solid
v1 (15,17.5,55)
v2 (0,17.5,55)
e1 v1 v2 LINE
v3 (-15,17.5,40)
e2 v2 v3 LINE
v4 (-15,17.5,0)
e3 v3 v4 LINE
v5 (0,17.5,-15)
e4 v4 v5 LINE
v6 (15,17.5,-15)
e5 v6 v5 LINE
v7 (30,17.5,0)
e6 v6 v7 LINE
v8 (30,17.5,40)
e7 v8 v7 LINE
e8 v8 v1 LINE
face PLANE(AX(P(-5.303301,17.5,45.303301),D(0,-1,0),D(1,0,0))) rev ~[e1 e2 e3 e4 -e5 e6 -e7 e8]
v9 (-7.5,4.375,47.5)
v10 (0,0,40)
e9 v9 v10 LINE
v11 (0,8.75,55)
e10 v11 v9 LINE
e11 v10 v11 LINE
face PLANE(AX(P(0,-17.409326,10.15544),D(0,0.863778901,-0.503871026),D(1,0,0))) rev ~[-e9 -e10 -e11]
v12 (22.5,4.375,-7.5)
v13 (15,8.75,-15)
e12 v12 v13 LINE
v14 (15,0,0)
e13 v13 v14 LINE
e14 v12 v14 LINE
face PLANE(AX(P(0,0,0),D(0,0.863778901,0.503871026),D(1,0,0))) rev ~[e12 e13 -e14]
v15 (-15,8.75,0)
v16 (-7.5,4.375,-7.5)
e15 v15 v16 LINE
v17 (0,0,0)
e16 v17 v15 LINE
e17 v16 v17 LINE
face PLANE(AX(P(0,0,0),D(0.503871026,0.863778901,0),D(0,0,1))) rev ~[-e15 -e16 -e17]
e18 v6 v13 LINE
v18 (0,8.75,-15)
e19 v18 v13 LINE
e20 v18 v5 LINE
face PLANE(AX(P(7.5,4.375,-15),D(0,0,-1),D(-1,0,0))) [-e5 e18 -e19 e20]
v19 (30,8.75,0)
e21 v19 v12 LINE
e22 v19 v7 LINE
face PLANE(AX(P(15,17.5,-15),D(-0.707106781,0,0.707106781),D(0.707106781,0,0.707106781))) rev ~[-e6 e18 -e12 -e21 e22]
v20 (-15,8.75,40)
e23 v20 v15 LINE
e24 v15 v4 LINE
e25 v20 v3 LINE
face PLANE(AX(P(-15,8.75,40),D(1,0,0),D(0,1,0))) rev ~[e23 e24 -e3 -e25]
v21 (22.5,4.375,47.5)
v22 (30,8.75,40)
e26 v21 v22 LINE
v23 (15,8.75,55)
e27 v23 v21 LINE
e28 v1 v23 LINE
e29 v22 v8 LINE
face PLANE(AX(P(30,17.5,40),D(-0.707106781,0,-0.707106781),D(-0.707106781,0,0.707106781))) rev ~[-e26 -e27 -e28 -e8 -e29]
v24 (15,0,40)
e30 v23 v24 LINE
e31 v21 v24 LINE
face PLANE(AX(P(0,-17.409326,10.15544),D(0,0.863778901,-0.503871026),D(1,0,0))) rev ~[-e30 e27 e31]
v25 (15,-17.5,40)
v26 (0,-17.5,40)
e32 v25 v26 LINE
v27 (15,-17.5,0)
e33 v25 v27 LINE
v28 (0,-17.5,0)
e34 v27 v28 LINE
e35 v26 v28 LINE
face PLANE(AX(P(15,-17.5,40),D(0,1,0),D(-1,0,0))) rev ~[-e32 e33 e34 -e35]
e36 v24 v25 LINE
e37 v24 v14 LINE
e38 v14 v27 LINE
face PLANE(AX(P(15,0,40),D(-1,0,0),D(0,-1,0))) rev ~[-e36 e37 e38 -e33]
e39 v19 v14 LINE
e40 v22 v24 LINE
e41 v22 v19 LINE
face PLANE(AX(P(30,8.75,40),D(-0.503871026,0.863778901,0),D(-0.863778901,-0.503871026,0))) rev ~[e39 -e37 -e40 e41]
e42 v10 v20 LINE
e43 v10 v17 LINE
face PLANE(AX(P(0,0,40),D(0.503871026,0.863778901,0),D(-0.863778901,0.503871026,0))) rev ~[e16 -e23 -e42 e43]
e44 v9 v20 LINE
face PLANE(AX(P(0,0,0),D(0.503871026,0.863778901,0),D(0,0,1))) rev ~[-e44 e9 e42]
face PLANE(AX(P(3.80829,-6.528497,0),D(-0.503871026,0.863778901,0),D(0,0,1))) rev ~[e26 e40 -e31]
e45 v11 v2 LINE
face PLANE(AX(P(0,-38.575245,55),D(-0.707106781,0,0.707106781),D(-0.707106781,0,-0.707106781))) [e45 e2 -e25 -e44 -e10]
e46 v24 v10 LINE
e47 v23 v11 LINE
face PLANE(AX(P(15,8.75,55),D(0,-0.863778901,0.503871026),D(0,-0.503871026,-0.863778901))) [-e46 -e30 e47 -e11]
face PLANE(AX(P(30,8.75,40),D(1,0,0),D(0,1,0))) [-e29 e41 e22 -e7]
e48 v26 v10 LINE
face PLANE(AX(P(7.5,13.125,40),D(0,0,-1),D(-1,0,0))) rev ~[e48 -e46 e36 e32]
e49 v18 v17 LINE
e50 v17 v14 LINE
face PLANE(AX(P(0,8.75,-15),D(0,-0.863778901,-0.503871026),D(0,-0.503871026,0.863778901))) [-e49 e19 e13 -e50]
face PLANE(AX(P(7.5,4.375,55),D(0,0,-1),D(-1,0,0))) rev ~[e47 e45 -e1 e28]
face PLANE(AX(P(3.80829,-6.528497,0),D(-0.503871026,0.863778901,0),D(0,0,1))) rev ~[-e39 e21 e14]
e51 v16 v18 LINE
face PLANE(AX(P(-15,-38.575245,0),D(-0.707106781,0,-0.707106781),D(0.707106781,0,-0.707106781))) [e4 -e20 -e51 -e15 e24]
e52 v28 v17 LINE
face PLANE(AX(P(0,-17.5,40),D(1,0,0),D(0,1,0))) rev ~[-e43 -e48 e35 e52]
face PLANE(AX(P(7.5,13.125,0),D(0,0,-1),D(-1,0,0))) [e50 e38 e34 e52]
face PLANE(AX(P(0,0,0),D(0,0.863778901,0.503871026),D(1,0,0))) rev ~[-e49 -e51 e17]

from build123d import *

# Parameters (mm, degrees)
F0_W          = 15
F0_H          = 8.75
F0_H_2        = 17.5
F1_DEPTH      = 40
F2_DEPTH      = 55
F3_DEPTH      = 15
F7_DEPTH      = 20.4590409994
F8_ANGLE      = 180
F10_DEPTH     = 25
F11_T4_DEPTH  = 56.0752448195
F11_T12_DEPTH = 56.0752448195
F11_T20_DEPTH = 56.0752448195
F11_T28_DEPTH = 56.0752448195


# Not quite as in the source:
# - a fillet or chamfer that OpenCascade refuses, or shapes differently, is made with other operations: its cross-section is extruded or revolved along the edge and cut away or added


with BuildPart() as f1:
    # F0 (on Top) → F1 (new body)
    with BuildSketch(Plane.XY):
        with Locations((0, 13.125)):
            Rectangle(F0_W, F0_H)
        with Locations((0, -8.75)):
            Rectangle(F0_W, F0_H_2)
        with Locations((0, 4.375)):
            Rectangle(F0_W, F0_H)
        with Locations((15, 13.125)):
            Rectangle(F0_W, F0_H)
        Polygon((22.5, 8.75), (7.5, 8.75), (7.5, 0), align=None)
        with Locations((-15, 13.125)):
            Rectangle(F0_W, F0_H)
        Polygon((-7.5, 0), (-7.5, 8.75), (-22.5, 8.75), align=None)
    extrude(amount=F1_DEPTH)



with BuildPart() as f2:
    # F0 (on Top) → F2 (new body)
    with BuildSketch(Plane.XY):
        with Locations((0, 4.375)):
            Rectangle(F0_W, F0_H)
        with Locations((0, 13.125)):
            Rectangle(F0_W, F0_H)
    extrude(amount=F2_DEPTH)


with BuildPart() as f1_1:
    add(f1.part)

    add(f2.part)  # F3 merges F2
    # F0 (on Top) → F3 (join)
    with BuildSketch(Plane.XY):
        with Locations((0, 4.375)):
            Rectangle(F0_W, F0_H)
        with Locations((0, 13.125)):
            Rectangle(F0_W, F0_H)
    extrude(amount=-F3_DEPTH)

    # F4: union 


with BuildPart() as f1_2:
    # F6: moved
    add(f1_1.part.moved(Location((7.5, 0, 0))))

    # F5 (on Right) → F7 (cut)
    with BuildSketch(Plane.YZ):
        Polygon((8.75, -15), (0, 0), (0, -15), align=None)
    extrude(amount=F7_DEPTH, mode=Mode.SUBTRACT)


with BuildPart() as f1_3:
    # F8: moved
    add(f1_2.part.rotate(Axis((7.5, 0, 0), (0, -1, 0)), F8_ANGLE))


with BuildPart() as f1_4:
    # F9: moved
    add(f1_3.part.moved(Location((0, 0, 40))))

    # F5 (on Right) → F10 (cut)
    with BuildSketch(Plane.YZ):
        Polygon((8.75, -15), (0, 0), (0, -15), align=None)
    extrude(amount=F10_DEPTH, mode=Mode.SUBTRACT)

    # F11: chamfer of 15 on 4 edges, made by hand


with BuildPart() as f11_tool2:
    # F11_s3 → F11_t4 (new body)
    with BuildSketch(Plane.XZ.offset(-17.5)):
        Polygon((30, 40), (15, 55), (15, 40), align=None)
    extrude(amount=F11_T4_DEPTH)

    split(bisect_by=Plane.YZ.offset(30), keep=Keep.BOTTOM)

    split(bisect_by=Plane(origin=(3.8082901554, -6.5284974093, 0), x_dir=(0, 0, 1), z_dir=(-0.5038710255, 0.8637789009, 0)), keep=Keep.TOP)

    split(bisect_by=Plane(origin=(0, -17.4093264249, 10.1554404145), x_dir=(1, 0, 0), z_dir=(0, 0.8637789009, -0.5038710255)), keep=Keep.TOP)

    split(bisect_by=Plane.XY.offset(55), keep=Keep.BOTTOM)


with BuildPart() as f1_5:
    add(f1_4.part)

    # F11_t1: union F11_tool2
    add(f11_tool2.part)


with BuildPart() as f11_tool10:
    # F11_s11 → F11_t12 (new body)
    with BuildSketch(Plane.XZ.offset(38.5752448195)):
        Polygon((-15, 0), (0, -15), (0, 0), align=None)
    extrude(amount=-F11_T12_DEPTH)

    split(bisect_by=Plane.YZ.offset(-15), keep=Keep.TOP)

    split(bisect_by=Plane(origin=(0, 0, 0), x_dir=(0, 0, 1), z_dir=(0.5038710255, 0.8637789009, 0)), keep=Keep.TOP)

    split(bisect_by=Plane.XY.offset(-15), keep=Keep.TOP)

    split(bisect_by=Plane(origin=(0, 0, 0), x_dir=(1, 0, 0), z_dir=(0, 0.8637789009, 0.5038710255)), keep=Keep.TOP)


with BuildPart() as f1_6:
    add(f1_5.part)

    # F11_t9: union F11_tool10
    add(f11_tool10.part)


with BuildPart() as f11_tool18:
    # F11_s19 → F11_t20 (new body)
    with BuildSketch(Plane.XZ.offset(-17.5)):
        Polygon((15, -15), (30, 0), (15, 0), align=None)
    extrude(amount=F11_T20_DEPTH)

    split(bisect_by=Plane.XY.offset(-15), keep=Keep.TOP)

    split(bisect_by=Plane(origin=(0, 0, 0), x_dir=(1, 0, 0), z_dir=(0, 0.8637789009, 0.5038710255)), keep=Keep.TOP)

    split(bisect_by=Plane(origin=(3.8082901554, -6.5284974093, 0), x_dir=(0, 0, 1), z_dir=(-0.5038710255, 0.8637789009, 0)), keep=Keep.TOP)

    split(bisect_by=Plane.YZ.offset(30), keep=Keep.BOTTOM)


with BuildPart() as f1_7:
    add(f1_6.part)

    # F11_t17: union F11_tool18
    add(f11_tool18.part)


with BuildPart() as f11_tool26:
    # F11_s27 → F11_t28 (new body)
    with BuildSketch(Plane.XZ.offset(38.5752448195)):
        Polygon((0, 55), (-15, 40), (0, 40), align=None)
    extrude(amount=-F11_T28_DEPTH)

    split(bisect_by=Plane.XY.offset(55), keep=Keep.BOTTOM)

    split(bisect_by=Plane(origin=(0, -17.4093264249, 10.1554404145), x_dir=(1, 0, 0), z_dir=(0, 0.8637789009, -0.5038710255)), keep=Keep.TOP)

    split(bisect_by=Plane.YZ.offset(-15), keep=Keep.TOP)

    split(bisect_by=Plane(origin=(0, 0, 0), x_dir=(0, 0, 1), z_dir=(0.5038710255, 0.8637789009, 0)), keep=Keep.TOP)


with BuildPart() as f1_8:
    add(f1_7.part)

    # F11_t25: union F11_tool26
    add(f11_tool26.part)


solid = f1_8.part
